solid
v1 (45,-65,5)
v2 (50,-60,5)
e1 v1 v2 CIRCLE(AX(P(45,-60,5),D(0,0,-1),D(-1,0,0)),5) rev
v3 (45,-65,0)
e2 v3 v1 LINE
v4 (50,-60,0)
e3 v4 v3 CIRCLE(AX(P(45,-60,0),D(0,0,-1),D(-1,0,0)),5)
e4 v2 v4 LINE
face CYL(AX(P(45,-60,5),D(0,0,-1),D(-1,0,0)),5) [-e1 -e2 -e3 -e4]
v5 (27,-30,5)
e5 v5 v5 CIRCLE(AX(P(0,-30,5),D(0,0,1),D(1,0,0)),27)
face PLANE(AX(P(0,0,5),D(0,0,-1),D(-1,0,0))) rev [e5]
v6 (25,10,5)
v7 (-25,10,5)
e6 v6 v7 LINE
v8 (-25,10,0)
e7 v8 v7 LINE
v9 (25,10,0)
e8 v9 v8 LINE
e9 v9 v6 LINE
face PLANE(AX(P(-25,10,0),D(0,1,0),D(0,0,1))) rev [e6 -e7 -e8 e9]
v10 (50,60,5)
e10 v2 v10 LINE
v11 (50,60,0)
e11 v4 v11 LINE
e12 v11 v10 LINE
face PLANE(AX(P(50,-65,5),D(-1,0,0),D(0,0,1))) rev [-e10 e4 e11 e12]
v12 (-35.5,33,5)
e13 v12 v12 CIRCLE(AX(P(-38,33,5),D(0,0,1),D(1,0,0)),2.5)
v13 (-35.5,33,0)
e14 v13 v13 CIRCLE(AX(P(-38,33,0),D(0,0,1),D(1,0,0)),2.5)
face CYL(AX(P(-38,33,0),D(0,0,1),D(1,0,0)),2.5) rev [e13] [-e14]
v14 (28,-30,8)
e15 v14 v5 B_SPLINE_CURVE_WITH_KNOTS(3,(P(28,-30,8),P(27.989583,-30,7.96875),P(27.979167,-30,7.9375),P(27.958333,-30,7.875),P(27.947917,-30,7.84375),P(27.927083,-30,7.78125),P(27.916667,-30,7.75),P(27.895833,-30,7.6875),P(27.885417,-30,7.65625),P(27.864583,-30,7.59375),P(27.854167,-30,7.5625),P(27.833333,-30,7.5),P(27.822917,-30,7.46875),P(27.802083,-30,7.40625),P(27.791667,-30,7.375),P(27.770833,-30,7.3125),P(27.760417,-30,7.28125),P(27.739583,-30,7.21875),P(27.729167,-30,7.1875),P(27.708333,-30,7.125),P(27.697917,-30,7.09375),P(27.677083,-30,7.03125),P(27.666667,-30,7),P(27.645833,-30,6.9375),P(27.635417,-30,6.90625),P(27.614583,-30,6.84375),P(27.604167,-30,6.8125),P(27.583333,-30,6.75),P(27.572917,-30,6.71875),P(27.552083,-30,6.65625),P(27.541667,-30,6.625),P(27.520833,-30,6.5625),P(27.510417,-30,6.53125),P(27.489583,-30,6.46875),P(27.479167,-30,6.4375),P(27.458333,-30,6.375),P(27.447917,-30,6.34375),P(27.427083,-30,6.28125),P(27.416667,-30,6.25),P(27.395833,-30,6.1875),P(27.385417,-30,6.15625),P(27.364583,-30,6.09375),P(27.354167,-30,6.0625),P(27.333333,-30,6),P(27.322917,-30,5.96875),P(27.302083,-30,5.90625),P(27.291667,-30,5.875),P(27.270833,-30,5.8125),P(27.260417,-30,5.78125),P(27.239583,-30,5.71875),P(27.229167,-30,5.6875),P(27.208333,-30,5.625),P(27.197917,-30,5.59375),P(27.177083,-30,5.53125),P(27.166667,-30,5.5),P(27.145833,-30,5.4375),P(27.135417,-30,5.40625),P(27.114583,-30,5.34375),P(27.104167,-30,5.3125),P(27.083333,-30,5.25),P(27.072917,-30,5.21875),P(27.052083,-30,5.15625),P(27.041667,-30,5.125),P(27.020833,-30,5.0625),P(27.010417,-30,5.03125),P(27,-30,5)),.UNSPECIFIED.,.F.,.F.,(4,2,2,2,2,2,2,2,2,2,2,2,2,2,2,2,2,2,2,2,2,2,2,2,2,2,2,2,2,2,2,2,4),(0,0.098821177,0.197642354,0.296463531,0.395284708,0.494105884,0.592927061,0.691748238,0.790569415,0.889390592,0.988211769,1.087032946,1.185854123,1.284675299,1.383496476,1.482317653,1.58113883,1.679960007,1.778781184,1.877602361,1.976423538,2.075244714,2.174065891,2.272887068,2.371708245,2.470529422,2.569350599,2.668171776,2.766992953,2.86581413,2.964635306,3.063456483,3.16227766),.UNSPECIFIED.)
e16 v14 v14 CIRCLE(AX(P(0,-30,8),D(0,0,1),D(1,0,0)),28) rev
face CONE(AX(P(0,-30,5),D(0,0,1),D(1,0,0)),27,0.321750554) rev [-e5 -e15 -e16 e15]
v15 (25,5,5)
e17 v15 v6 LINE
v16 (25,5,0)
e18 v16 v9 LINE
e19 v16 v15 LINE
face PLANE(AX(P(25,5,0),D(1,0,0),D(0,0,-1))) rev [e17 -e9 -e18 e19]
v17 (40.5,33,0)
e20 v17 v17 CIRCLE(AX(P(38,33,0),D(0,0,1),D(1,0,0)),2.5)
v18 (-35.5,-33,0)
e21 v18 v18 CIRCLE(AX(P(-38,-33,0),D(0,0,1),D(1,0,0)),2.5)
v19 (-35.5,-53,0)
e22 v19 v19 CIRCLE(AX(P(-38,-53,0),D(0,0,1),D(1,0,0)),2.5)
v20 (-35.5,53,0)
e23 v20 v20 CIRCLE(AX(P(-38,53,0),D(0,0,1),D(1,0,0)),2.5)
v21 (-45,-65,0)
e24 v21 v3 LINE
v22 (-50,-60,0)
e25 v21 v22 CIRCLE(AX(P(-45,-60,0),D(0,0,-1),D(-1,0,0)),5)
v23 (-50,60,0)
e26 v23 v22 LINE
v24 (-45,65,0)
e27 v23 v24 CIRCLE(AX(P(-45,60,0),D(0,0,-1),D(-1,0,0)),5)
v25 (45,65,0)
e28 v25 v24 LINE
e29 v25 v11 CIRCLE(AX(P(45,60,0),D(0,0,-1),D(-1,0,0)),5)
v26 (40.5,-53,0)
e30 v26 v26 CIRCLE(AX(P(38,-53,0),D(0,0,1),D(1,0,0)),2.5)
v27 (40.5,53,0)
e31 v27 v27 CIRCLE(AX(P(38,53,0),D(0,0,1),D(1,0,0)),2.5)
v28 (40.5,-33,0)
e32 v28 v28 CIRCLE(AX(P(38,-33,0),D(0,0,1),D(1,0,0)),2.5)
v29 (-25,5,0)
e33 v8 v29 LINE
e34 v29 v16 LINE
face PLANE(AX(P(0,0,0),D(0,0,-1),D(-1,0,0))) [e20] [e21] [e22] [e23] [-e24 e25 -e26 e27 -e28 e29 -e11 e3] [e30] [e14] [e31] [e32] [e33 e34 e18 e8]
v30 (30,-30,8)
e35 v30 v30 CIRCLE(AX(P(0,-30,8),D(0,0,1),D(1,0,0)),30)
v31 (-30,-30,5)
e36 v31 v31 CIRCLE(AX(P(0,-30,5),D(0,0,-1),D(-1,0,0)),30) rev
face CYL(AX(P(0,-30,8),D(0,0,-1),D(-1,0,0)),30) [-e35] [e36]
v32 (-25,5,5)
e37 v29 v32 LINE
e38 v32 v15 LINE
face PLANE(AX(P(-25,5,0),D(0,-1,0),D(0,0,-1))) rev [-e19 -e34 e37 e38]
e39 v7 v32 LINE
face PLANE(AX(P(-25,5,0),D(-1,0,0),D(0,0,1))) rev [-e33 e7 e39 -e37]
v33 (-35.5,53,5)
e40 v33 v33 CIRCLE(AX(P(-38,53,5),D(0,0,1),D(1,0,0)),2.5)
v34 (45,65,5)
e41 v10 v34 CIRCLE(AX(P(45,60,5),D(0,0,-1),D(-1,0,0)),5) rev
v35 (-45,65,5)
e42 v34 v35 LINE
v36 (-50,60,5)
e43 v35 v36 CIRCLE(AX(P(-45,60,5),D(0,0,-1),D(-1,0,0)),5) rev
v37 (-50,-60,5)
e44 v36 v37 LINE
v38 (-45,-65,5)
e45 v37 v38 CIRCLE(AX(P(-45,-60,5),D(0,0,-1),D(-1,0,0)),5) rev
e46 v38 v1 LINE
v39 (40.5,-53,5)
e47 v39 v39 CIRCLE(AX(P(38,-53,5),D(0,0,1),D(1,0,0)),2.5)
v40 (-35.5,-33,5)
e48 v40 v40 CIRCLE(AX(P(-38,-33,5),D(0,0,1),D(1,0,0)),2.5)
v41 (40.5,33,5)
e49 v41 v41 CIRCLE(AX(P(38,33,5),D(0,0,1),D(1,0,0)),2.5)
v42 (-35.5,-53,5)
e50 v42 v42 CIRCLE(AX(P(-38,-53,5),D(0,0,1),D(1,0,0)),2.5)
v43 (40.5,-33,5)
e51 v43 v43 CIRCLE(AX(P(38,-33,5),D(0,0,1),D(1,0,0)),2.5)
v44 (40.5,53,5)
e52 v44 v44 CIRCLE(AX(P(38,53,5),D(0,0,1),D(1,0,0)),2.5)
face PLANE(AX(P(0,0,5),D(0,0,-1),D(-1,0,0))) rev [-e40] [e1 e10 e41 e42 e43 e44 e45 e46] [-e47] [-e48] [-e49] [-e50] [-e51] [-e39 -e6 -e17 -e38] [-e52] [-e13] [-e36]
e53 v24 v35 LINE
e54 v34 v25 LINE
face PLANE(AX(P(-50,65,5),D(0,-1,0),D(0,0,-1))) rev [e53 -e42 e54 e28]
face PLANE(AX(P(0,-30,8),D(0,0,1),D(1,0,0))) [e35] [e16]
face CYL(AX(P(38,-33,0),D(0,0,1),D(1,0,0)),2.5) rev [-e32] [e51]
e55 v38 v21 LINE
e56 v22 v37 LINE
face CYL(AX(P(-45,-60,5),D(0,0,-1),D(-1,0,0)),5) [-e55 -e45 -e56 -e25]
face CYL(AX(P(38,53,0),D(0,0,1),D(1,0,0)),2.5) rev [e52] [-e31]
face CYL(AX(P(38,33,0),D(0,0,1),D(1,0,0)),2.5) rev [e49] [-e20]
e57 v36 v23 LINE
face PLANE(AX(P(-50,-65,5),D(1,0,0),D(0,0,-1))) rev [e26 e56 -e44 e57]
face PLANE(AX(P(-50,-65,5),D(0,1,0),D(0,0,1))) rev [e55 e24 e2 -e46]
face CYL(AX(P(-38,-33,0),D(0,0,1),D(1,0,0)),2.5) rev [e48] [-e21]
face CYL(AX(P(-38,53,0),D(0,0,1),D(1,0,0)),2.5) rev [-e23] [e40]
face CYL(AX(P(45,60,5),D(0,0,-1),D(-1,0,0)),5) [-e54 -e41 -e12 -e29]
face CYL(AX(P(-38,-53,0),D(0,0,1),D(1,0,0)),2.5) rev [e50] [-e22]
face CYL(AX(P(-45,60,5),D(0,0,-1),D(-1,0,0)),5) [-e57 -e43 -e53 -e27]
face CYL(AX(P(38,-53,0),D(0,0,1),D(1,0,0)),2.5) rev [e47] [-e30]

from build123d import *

# Parameters (mm, degrees)
SKIZZE1_W                       = 100
SKIZZE1_H                       = 130
AUFSATZ_LINEAR_AUSTRAGEN1_DEPTH = 5
SKIZZE2_R                       = 30
SKIZZE2_R_2                     = 27
AUFSATZ_LINEAR_AUSTRAGEN2_DEPTH = 3
SKIZZE4_R                       = 2.5
SKIZZE4_W                       = 50
SKIZZE4_H                       = 5
SCHNITT_LINEAR_AUSTRAGEN1_DEPTH = 83.158383626
FASE1_SIZE2                     = 3
FASE1_SIZE                      = 1
VERRUNDUNG1_R                   = 5


with BuildPart() as part:
    # Skizze1 → Aufsatz-Linear austragen1 (new body)
    with BuildSketch(Plane.XY):
        Rectangle(SKIZZE1_W, SKIZZE1_H)
    extrude(amount=AUFSATZ_LINEAR_AUSTRAGEN1_DEPTH)

    # Skizze2 → Aufsatz-Linear austragen2 (add)
    with BuildSketch(Plane.XY.offset(5)):
        with Locations(Location((0, -30, 0), (0, 0, 180))):
            Circle(SKIZZE2_R)
        with Locations((0, -30)):
            Circle(SKIZZE2_R_2, mode=Mode.SUBTRACT)
    extrude(amount=AUFSATZ_LINEAR_AUSTRAGEN2_DEPTH)

    # Skizze4 → Schnitt-Linear austragen1 (cut, through all)
    with BuildSketch(Plane.XY.offset(5)):
        with Locations((-38, -53)):
            Circle(SKIZZE4_R)
        with Locations((38, -53)):
            Circle(SKIZZE4_R)
        with Locations((38, 53)):
            Circle(SKIZZE4_R)
        with Locations((-38, 53)):
            Circle(SKIZZE4_R)
        with Locations((-38, -33)):
            Circle(SKIZZE4_R)
        with Locations((38, -33)):
            Circle(SKIZZE4_R)
        with Locations((38, 33)):
            Circle(SKIZZE4_R)
        with Locations((-38, 33)):
            Circle(SKIZZE4_R)
        with Locations((0, 7.5)):
            Rectangle(SKIZZE4_W, SKIZZE4_H)
    extrude(amount=-SCHNITT_LINEAR_AUSTRAGEN1_DEPTH, mode=Mode.SUBTRACT)

    # Fase1
    fase1_edges = [part.edges().sort_by_distance(p)[0] for p in [
        (-27, -30, 8),
    ]]
    fase1_side = [part.faces().sort_by_distance(p)[0] for p in [
        (-27.02, -30, 8),
    ]]
    chamfer(fase1_edges, length=FASE1_SIZE - 0.0001, length2=FASE1_SIZE2 - 0.0001, reference=fase1_side[0])  # a hair under: the kernel refuses the full size

    # Verrundung1
    verrundung1_edges = [part.edges().sort_by_distance(p)[0] for p in [
        (50, -65, 2.5),
        (-50, -65, 2.5),
        (-50, 65, 2.5),
        (50, 65, 2.5),
    ]]
    fillet(verrundung1_edges, radius=VERRUNDUNG1_R)


solid = part.part
